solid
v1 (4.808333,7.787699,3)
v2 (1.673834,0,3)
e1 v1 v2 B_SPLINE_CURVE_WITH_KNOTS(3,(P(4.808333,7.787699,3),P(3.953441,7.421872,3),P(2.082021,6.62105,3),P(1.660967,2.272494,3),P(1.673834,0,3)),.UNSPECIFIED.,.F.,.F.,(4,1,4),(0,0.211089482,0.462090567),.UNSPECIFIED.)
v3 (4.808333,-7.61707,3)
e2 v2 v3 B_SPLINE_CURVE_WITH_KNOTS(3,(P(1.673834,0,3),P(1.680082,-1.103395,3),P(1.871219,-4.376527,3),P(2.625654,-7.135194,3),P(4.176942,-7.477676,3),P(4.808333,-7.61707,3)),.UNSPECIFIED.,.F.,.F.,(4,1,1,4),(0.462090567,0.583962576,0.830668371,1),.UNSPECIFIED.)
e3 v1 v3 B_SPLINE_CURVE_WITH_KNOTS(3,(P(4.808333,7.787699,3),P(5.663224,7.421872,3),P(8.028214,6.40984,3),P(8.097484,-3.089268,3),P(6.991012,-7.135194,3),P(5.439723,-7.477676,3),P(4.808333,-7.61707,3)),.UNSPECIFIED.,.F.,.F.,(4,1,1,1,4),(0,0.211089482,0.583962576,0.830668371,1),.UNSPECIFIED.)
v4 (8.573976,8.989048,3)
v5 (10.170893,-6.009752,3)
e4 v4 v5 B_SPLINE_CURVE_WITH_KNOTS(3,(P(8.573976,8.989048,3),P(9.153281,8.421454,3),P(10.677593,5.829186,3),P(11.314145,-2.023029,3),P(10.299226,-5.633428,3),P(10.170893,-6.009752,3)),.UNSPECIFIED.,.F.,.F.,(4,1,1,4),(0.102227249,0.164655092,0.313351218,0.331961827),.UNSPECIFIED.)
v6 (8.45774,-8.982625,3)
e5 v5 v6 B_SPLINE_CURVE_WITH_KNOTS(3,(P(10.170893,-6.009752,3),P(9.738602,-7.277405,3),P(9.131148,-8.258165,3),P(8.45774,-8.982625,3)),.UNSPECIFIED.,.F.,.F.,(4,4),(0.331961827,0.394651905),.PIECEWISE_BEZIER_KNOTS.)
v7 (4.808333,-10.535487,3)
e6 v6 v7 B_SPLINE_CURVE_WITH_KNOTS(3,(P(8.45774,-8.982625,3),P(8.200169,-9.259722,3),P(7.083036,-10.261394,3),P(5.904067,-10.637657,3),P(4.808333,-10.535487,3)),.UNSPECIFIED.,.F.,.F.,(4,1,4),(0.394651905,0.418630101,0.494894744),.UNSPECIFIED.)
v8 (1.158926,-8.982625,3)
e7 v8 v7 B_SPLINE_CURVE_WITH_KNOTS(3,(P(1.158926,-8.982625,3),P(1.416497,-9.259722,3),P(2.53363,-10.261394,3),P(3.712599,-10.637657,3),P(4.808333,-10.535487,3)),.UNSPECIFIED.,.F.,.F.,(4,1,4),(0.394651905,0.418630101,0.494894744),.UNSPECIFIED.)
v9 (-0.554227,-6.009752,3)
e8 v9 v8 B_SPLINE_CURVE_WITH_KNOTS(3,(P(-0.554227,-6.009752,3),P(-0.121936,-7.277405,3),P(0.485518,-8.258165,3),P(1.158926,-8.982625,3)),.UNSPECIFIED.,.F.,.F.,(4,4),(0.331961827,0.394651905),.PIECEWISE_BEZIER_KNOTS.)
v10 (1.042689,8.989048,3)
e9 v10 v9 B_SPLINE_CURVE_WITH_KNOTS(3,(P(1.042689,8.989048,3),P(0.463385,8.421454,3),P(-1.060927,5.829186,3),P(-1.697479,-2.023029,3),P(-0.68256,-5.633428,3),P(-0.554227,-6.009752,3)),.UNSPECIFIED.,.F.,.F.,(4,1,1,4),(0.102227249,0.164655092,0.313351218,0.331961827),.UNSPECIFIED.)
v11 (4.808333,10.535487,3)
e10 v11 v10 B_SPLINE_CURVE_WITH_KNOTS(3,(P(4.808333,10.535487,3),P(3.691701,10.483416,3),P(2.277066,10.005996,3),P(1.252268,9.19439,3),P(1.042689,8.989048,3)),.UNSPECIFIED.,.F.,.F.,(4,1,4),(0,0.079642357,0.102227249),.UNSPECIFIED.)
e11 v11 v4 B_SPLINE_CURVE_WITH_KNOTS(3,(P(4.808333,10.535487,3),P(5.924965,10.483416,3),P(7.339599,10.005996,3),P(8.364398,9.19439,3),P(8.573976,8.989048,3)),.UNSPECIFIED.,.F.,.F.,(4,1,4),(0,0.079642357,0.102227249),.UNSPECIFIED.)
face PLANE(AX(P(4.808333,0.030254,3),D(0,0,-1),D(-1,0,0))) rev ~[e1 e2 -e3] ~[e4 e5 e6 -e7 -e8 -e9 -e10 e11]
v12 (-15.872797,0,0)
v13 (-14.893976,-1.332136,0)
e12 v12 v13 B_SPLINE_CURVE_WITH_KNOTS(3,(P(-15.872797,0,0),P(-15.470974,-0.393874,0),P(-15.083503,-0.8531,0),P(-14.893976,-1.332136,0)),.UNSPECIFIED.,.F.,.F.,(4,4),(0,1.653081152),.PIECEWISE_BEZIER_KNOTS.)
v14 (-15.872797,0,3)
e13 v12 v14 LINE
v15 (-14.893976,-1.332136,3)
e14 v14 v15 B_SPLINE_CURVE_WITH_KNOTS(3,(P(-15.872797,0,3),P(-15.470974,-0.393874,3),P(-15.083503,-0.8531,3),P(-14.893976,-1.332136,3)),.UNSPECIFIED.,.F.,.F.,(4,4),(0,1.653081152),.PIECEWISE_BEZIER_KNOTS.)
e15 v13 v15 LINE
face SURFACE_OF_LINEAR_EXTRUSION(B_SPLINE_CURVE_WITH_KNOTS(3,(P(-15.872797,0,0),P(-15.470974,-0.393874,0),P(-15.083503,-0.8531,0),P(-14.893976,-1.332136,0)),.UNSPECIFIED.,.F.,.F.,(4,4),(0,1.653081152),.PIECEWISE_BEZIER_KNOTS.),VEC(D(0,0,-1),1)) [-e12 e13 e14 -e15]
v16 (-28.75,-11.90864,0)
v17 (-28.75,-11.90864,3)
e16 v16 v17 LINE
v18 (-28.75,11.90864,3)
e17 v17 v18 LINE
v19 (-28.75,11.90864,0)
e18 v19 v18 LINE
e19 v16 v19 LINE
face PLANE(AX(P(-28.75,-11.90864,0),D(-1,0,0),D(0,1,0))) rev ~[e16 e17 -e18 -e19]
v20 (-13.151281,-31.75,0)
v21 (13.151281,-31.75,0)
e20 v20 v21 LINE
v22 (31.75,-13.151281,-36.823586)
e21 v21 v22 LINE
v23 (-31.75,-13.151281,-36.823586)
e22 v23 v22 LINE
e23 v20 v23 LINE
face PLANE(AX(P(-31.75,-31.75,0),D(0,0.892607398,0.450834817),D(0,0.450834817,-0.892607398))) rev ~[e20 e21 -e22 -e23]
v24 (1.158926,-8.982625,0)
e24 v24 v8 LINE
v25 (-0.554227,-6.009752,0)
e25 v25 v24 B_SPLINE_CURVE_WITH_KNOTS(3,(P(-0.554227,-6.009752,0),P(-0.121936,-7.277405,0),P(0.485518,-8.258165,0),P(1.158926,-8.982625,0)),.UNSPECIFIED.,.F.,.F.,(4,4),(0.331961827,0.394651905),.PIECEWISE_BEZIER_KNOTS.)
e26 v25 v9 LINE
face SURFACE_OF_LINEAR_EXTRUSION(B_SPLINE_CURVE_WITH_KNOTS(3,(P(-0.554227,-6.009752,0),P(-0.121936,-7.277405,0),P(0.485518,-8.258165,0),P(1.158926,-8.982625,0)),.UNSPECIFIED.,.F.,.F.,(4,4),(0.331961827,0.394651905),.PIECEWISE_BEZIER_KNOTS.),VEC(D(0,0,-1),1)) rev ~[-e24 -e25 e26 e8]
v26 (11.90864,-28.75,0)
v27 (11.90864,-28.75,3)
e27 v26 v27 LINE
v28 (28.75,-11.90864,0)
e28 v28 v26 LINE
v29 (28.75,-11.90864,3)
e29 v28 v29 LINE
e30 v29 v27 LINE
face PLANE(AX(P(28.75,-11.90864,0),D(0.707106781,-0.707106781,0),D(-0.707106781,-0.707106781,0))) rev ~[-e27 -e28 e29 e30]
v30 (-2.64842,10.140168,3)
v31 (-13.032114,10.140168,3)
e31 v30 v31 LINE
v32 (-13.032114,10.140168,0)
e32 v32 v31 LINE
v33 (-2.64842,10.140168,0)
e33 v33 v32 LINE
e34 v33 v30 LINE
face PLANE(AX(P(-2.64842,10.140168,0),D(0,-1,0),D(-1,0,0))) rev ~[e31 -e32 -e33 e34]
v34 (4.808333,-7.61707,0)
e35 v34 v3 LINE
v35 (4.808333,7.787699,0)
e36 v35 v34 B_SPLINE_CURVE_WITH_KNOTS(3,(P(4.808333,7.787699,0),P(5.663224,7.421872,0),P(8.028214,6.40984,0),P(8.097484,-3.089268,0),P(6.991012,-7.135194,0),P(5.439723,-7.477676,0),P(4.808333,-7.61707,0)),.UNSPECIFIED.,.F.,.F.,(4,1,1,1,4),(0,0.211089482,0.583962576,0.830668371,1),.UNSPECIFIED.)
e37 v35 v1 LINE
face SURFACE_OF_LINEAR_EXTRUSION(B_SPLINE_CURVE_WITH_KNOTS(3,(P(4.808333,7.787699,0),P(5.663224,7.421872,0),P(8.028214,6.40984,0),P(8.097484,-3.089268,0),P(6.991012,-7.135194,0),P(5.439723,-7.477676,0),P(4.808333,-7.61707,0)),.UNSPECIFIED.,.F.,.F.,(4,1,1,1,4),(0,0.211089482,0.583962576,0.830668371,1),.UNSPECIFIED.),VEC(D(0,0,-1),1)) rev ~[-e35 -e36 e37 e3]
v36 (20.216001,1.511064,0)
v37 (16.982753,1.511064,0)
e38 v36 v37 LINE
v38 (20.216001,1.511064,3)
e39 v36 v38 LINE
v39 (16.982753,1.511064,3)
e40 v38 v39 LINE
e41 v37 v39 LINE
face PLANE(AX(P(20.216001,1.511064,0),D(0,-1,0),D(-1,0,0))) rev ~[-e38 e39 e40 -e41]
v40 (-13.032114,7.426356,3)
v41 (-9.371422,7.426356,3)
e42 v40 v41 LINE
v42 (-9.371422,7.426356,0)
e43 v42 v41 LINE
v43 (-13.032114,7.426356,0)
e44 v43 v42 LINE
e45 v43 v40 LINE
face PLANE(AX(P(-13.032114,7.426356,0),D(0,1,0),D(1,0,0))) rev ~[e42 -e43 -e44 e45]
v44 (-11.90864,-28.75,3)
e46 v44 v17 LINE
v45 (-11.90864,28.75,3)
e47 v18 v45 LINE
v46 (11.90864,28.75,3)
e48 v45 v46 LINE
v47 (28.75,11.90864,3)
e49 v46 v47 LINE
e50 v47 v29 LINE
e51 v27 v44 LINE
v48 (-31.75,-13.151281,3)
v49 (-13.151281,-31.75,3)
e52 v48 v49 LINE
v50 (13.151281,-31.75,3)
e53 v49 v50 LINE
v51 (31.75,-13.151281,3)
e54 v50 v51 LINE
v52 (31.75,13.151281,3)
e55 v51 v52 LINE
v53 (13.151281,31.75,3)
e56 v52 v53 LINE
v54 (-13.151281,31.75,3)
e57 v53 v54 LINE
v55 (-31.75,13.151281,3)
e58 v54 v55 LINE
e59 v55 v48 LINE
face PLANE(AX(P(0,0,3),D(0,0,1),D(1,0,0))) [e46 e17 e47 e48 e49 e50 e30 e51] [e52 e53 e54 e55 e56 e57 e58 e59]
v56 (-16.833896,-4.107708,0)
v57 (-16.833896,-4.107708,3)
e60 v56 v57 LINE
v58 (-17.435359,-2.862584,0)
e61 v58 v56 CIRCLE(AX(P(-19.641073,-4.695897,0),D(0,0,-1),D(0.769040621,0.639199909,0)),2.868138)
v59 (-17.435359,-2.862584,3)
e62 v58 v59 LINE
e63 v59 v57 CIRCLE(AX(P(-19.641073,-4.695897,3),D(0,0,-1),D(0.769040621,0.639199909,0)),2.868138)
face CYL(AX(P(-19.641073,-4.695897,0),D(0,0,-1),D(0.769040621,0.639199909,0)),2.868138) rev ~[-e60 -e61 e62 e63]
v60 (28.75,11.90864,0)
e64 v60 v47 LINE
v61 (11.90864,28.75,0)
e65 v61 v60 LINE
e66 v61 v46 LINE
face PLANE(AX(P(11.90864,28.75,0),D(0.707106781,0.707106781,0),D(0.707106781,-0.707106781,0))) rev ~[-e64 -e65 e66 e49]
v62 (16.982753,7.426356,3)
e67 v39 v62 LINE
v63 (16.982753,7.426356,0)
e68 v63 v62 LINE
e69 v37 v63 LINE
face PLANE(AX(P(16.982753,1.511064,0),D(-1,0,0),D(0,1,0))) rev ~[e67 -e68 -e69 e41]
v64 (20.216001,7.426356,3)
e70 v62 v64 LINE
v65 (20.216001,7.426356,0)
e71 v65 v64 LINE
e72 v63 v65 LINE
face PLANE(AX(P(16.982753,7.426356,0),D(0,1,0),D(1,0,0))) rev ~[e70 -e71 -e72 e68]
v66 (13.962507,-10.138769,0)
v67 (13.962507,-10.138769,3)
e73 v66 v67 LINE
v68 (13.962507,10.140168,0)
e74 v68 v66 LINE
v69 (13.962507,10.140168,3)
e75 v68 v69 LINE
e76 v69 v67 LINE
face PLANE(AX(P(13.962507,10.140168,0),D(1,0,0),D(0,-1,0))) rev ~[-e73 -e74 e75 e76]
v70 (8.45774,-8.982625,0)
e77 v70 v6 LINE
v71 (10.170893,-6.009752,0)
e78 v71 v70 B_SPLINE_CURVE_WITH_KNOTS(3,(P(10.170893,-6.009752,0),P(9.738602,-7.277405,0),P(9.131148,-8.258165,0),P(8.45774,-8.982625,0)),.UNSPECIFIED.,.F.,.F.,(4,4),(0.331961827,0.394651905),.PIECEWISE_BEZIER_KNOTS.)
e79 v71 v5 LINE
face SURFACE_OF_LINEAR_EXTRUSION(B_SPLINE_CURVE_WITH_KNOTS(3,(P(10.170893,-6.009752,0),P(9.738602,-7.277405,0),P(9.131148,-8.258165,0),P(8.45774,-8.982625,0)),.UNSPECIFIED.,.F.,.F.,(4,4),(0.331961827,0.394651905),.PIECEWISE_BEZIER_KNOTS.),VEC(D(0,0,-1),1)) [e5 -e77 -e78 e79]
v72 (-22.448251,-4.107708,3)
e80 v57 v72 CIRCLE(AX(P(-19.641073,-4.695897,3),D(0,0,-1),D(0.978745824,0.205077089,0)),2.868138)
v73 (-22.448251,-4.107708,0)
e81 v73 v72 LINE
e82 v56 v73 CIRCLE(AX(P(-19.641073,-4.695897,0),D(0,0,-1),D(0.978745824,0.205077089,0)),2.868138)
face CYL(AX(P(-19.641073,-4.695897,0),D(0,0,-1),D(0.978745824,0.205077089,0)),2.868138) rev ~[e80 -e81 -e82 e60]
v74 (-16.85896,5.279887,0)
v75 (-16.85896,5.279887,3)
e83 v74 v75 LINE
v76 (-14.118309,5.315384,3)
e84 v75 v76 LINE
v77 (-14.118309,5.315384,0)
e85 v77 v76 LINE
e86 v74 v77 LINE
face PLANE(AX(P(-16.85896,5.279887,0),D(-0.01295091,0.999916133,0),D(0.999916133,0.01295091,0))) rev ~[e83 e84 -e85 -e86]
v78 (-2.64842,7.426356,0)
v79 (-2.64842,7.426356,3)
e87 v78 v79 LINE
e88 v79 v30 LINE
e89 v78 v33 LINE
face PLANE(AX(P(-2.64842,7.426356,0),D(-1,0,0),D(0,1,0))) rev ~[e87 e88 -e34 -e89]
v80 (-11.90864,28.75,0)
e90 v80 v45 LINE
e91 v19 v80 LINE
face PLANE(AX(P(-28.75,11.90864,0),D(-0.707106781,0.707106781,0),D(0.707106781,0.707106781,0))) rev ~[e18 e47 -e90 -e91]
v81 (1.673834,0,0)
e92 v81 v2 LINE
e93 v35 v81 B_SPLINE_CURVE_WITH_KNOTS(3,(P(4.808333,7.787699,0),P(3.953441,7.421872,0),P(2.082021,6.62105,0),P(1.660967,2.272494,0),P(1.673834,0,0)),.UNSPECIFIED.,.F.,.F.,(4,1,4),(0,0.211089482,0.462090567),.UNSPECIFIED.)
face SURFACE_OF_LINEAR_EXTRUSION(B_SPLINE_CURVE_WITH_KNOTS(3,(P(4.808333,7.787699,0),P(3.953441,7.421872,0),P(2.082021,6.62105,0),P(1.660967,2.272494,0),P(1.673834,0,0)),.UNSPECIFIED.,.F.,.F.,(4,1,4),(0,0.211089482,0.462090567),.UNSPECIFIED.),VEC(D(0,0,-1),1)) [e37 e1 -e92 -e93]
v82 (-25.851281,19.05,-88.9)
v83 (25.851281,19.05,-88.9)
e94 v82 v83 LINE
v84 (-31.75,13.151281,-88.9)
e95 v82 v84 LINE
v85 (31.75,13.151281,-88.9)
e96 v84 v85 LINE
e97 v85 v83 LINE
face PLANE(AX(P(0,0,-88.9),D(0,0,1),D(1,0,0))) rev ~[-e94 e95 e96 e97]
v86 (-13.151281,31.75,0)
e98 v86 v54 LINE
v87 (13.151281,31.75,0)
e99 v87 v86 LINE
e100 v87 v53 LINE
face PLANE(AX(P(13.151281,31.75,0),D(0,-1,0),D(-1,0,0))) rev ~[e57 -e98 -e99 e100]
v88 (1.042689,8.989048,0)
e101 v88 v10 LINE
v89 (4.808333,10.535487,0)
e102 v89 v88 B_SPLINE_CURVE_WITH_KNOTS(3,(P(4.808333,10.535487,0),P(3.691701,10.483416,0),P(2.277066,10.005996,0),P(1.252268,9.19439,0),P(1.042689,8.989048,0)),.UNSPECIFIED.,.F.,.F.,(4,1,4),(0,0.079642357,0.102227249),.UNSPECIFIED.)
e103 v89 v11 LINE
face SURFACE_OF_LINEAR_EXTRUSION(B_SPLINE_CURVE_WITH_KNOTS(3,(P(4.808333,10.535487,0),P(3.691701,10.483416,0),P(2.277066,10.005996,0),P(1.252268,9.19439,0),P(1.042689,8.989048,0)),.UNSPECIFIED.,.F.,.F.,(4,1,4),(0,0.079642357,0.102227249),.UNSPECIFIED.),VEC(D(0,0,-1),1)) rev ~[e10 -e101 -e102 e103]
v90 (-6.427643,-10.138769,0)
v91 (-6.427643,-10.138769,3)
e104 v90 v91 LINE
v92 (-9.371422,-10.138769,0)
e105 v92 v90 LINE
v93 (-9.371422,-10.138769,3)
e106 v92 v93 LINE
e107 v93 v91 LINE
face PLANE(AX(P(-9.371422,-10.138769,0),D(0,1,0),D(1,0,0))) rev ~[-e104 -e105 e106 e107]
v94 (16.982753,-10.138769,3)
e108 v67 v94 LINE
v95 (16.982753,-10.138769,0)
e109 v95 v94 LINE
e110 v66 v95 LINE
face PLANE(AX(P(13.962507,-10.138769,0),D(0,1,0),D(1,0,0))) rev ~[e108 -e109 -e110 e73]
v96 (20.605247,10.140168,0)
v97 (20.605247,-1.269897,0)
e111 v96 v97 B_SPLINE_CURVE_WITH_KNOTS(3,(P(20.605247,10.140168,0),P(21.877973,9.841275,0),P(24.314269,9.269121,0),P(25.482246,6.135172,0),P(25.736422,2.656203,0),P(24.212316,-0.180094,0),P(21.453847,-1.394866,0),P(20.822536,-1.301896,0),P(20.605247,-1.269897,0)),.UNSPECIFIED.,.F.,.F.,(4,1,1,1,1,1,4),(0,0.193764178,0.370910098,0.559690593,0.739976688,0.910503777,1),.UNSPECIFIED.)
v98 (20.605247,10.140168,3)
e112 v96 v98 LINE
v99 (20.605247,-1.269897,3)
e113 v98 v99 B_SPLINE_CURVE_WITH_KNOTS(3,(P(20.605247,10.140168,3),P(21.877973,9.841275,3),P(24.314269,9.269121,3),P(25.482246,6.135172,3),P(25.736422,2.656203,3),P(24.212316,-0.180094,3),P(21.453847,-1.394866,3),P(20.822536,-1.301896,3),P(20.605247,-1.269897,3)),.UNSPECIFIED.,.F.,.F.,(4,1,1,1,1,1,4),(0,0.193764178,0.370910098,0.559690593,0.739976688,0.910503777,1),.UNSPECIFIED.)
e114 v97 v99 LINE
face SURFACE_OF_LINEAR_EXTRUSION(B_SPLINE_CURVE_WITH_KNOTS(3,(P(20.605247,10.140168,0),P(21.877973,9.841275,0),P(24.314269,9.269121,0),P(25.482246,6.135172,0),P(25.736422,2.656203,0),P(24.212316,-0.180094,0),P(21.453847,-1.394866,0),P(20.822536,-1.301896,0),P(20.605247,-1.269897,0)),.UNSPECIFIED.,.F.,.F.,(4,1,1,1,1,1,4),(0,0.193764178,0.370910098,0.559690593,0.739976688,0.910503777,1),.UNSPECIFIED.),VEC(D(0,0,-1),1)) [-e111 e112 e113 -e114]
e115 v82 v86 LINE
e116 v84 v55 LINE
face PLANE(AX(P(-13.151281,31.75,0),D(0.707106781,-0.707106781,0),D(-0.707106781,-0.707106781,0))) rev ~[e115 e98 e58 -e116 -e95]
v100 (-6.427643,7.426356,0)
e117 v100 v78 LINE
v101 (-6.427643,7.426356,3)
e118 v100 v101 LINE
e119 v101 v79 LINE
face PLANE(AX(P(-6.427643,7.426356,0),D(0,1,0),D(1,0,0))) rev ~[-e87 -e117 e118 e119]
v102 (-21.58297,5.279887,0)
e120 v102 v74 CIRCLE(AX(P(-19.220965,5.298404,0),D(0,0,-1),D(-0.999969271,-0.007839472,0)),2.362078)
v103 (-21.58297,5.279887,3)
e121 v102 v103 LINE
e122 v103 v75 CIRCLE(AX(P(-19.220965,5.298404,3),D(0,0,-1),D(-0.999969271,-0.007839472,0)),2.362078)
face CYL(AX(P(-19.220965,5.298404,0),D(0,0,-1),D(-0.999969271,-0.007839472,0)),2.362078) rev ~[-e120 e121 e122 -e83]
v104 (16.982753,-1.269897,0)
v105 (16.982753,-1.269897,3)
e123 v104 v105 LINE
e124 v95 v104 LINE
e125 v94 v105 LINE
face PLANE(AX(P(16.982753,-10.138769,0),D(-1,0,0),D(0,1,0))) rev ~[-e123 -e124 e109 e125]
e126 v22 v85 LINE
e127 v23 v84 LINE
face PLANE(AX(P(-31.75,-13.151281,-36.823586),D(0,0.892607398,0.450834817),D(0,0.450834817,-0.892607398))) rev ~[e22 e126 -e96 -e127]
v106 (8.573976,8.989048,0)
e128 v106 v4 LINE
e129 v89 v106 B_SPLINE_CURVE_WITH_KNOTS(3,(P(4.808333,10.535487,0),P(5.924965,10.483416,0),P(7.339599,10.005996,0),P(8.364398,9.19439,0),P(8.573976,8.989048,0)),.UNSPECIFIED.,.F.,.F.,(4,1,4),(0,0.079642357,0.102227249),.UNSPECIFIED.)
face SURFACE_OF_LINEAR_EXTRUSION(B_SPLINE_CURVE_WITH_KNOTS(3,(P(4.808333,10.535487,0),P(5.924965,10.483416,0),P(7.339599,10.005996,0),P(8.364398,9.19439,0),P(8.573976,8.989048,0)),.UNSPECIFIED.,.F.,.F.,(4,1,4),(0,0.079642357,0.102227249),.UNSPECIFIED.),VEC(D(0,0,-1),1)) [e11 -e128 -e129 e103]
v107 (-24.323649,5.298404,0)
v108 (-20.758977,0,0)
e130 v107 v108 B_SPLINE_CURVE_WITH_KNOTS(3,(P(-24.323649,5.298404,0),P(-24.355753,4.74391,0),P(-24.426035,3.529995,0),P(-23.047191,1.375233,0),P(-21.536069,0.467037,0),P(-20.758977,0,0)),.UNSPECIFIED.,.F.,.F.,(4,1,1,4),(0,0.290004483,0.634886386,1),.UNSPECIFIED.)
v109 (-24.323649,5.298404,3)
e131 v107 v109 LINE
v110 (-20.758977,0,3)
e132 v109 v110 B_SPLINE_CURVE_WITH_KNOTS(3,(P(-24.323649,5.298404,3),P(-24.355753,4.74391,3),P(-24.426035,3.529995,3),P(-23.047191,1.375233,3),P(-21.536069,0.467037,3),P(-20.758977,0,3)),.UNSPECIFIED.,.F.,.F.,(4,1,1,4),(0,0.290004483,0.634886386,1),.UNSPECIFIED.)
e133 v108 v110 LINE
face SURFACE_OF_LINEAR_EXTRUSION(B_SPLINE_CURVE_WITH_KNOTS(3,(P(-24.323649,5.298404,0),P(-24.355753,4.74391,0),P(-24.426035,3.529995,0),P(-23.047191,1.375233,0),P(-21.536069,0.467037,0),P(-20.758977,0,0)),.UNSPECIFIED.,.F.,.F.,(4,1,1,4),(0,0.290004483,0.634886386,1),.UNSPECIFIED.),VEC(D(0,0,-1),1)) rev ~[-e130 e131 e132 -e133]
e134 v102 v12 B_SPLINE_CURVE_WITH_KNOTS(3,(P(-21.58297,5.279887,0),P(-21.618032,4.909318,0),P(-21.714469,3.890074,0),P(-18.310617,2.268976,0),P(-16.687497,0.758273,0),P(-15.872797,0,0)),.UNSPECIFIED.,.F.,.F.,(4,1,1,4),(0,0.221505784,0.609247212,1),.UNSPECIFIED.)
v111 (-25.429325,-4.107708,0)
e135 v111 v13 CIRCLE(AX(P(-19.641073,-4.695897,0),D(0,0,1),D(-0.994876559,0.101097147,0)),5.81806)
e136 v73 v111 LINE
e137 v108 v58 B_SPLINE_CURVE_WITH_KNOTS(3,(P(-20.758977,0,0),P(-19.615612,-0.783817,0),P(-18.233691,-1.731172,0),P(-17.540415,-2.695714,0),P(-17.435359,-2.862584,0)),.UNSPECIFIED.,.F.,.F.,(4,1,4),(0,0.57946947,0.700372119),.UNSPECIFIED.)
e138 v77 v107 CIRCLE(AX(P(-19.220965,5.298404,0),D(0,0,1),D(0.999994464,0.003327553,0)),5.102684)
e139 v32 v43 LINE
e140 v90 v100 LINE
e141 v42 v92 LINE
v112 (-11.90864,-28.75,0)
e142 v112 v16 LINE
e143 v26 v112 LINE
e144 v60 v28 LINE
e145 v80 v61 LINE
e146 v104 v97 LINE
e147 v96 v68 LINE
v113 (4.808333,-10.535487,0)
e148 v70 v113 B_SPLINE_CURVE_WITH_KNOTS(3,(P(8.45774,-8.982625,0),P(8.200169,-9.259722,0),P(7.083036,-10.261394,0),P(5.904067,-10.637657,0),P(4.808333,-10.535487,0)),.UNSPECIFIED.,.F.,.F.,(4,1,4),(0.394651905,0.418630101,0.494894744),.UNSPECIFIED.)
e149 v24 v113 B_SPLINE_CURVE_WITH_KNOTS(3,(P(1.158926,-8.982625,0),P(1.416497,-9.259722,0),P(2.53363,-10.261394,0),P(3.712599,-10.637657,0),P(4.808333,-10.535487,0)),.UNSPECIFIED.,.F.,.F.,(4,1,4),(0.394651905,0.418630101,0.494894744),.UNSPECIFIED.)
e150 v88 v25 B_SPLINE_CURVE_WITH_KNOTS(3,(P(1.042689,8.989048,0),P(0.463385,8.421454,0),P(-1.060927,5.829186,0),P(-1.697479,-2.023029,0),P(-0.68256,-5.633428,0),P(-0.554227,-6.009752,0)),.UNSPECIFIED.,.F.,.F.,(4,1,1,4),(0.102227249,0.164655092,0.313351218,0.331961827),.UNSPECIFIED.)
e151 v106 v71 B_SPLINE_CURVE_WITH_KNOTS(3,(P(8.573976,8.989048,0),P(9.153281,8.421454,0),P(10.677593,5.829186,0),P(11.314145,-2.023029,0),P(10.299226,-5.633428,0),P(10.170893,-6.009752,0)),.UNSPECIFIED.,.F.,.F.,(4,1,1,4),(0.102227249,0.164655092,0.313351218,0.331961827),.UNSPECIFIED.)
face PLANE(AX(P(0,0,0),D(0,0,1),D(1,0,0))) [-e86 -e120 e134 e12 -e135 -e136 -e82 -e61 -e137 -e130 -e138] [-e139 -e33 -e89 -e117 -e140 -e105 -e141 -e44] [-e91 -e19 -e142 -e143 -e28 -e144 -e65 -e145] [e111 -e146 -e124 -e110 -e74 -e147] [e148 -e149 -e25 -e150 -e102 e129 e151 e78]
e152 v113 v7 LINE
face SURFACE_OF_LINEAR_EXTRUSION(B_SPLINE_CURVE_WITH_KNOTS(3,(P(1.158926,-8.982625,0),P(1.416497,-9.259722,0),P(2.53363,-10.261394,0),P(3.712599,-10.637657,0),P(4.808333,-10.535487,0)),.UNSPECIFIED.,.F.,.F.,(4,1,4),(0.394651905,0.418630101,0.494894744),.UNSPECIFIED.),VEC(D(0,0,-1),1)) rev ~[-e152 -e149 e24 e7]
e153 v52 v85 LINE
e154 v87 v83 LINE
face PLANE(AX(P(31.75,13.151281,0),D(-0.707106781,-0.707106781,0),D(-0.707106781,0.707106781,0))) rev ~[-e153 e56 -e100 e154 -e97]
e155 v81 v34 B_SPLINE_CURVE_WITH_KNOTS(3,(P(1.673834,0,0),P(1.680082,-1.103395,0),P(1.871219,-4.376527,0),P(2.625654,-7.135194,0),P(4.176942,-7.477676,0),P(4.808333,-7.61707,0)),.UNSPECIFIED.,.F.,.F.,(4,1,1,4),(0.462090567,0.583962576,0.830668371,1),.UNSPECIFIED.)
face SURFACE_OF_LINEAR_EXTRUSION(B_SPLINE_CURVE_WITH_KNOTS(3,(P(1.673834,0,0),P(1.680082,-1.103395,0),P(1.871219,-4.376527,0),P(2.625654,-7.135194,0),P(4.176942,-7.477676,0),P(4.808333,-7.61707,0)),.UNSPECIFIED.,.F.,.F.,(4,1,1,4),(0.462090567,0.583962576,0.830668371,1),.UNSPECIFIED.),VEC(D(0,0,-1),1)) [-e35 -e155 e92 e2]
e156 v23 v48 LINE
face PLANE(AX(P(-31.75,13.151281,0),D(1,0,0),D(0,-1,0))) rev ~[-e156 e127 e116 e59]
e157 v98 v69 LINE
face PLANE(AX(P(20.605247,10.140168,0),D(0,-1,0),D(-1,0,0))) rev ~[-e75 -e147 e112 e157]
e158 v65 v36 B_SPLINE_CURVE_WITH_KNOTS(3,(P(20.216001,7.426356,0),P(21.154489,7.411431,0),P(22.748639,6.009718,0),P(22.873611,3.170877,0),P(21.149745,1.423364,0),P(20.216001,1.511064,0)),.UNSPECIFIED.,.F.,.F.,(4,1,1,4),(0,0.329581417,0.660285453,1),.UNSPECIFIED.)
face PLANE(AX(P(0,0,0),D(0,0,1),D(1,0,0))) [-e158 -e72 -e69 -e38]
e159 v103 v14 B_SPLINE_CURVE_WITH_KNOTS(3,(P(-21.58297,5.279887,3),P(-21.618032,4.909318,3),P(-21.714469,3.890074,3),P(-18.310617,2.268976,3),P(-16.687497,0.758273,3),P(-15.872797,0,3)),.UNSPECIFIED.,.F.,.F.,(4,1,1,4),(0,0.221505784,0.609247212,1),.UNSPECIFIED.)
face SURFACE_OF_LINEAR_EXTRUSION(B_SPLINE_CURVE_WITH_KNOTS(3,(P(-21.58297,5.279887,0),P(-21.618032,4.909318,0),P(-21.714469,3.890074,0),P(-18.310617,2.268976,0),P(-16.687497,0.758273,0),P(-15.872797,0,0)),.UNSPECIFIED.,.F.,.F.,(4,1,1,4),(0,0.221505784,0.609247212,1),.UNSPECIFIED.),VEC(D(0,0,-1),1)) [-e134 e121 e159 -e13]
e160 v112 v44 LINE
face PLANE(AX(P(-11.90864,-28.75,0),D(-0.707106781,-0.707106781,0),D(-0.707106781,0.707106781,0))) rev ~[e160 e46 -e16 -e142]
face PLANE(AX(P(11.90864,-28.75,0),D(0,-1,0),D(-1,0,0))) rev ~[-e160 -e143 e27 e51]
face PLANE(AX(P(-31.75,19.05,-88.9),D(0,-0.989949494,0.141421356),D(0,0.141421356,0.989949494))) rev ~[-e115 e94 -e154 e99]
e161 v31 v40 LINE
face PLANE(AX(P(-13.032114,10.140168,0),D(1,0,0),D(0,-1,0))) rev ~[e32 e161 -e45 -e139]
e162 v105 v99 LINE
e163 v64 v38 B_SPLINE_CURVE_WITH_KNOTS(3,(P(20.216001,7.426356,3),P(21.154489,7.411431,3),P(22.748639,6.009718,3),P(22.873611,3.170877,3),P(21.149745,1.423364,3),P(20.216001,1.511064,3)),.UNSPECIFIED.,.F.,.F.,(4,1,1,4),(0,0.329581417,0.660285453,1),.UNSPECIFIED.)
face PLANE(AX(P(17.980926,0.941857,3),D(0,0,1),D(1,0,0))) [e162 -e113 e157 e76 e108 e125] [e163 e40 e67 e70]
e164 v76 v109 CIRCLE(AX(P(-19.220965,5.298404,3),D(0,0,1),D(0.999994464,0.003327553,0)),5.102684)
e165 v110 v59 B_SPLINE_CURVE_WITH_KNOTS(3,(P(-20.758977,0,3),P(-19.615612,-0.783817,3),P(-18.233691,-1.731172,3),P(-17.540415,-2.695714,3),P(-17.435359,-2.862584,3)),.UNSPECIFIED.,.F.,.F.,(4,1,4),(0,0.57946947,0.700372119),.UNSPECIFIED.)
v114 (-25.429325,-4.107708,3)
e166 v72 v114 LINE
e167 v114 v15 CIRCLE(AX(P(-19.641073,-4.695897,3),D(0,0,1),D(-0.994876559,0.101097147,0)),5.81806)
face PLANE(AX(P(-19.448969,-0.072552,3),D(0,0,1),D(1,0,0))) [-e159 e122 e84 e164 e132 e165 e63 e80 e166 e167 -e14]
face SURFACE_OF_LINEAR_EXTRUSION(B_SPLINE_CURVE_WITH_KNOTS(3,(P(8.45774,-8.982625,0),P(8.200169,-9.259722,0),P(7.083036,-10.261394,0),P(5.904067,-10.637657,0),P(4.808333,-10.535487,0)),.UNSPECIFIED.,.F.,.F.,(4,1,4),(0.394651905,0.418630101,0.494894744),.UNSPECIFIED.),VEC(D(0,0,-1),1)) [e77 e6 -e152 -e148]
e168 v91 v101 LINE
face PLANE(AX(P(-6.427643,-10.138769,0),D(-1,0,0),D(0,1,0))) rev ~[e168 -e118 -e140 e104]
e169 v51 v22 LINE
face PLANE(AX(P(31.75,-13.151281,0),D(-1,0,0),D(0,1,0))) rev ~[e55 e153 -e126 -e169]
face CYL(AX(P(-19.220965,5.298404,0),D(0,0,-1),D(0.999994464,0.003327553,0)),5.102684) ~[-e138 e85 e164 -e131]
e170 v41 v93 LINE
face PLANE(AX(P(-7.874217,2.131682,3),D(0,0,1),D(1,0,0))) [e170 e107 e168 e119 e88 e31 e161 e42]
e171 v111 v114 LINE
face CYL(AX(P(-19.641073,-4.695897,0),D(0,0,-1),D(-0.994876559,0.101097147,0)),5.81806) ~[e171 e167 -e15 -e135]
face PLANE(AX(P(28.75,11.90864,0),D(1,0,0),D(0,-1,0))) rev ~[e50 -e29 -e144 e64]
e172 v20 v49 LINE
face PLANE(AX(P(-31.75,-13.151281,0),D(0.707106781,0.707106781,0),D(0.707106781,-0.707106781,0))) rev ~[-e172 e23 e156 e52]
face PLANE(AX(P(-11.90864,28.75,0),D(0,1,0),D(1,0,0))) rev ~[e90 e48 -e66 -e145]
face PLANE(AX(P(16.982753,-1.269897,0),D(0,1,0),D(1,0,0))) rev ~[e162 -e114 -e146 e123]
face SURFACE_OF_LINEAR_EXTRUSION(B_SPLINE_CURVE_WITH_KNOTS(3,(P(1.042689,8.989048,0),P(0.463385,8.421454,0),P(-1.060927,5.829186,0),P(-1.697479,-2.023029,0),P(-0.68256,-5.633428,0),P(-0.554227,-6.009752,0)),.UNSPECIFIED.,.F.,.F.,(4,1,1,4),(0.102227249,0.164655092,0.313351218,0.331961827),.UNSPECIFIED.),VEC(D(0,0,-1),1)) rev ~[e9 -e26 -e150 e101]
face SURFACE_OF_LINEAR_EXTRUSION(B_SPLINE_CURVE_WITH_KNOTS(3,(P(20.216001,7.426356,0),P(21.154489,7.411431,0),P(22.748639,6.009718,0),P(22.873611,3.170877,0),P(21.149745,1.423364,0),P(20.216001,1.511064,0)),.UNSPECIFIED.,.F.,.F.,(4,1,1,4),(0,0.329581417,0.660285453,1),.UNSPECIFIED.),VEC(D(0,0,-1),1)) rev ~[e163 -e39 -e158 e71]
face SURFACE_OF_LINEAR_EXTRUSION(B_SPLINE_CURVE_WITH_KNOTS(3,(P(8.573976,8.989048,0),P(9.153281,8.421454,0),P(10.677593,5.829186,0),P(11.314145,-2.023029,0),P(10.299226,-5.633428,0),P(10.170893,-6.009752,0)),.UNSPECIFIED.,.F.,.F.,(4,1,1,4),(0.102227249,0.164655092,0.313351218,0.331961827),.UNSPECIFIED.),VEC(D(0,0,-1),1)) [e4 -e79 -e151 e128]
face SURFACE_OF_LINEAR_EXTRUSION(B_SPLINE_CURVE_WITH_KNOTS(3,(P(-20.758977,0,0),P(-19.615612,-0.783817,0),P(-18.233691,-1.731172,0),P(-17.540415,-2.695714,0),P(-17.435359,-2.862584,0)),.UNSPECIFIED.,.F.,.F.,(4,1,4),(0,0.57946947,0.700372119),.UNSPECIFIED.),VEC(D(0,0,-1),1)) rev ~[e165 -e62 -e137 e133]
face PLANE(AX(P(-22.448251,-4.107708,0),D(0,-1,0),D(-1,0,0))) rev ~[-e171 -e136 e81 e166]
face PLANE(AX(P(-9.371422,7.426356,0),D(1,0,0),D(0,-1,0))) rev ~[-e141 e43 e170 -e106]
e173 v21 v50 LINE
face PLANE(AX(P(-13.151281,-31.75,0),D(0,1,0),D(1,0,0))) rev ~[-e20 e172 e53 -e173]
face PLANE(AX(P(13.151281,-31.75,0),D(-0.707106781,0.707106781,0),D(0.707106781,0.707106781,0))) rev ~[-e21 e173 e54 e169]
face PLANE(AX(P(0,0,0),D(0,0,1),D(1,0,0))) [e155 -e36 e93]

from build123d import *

# Parameters (mm, degrees)
F1_DEPTH   = 88.9
F1_FACE1_W = 26.3025612107
F1_FACE1_H = 88.9
F3_DEPTH   = 63.5
F5_DEPTH   = 3


# Not quite as in the source:
# - a feature names something its author has since deleted; it is built from what else it names


with BuildPart() as f1:
    # F0 (on Top) → F1 (new body)
    with BuildSketch(Plane.XY):
        Polygon((13.1512806053, 31.75), (-13.1512806053, 31.75), (-31.75, 13.1512806053), (-31.75, -13.1512806053), (-13.1512806053, -31.75), (13.1512806053, -31.75), (31.75, -13.1512806053), (31.75, 13.1512806053), align=None)
    extrude(amount=-F1_DEPTH)

    # F2 (on face) + F1_face1 (on face) → F3 (cut, through all)
    with BuildSketch(Plane(origin=(-31.75, 0, 0), x_dir=(0, -1, 0), z_dir=(-1, 0, 0))):
        Polygon((-19.05, -88.9), (-31.75, 0), (-31.75, -88.9), align=None)
        Polygon((31.75, -88.9), (31.75, 0), (13.1512806053, -36.823585695), (13.1512806053, -88.9), (14.6601814777, -88.9), align=None)
        Polygon((13.1512806053, -36.823585695), (-13.1512806053, -88.9), (-12.7, -88.9), (-6.35, -88.9), (0, -88.9), (8.3101814777, -88.9), (13.1512806053, -88.9), align=None)
    with BuildSketch(Plane(origin=(22.4506403027, -22.4506403027, -44.45), x_dir=(0.7071067812, 0.7071067812, 0), z_dir=(0.7071067812, -0.7071067812, 0))):
        Rectangle(F1_FACE1_W, F1_FACE1_H)
    extrude(amount=-F3_DEPTH, dir=(-1, 0, 0), mode=Mode.SUBTRACT)

    # F4 (on face) → F5 (join)
    with BuildSketch(Plane.XY):
        Polygon((13.1512806053, 31.75), (-13.1512806053, 31.75), (-31.75, 13.1512806053), (-31.75, -13.1512806053), (-13.1512806053, -31.75), (13.1512806053, -31.75), (31.75, -13.1512806053), (31.75, 13.1512806053), align=None)
        Polygon((-28.75, 10.7754608616), (-28.75, 11.9086399182), (-11.9086399182, 28.75), (11.9086399182, 28.75), (28.75, 11.9086399182), (28.75, 10.7754608616), (28.75, -10.7754608616), (28.75, -11.9086399182), (11.9086399182, -28.75), (-11.9086399182, -28.75), (-28.75, -11.9086399182), (-28.75, -10.7754608616), align=None, mode=Mode.SUBTRACT)
        with BuildLine():
            add(Edge.make_bspline(
                [(4.8083327711, 10.5354869738), (5.9249649259, 10.4834162819), (7.339599469, 10.0059956165), (8.3643975774, 9.1943899894), (8.5739761095, 8.9890481737)],
                knots=[0, 0, 0, 0, 0.0796423572, 0.1022272486, 0.1022272486, 0.1022272486, 0.1022272486], degree=3))
            add(Edge.make_bspline(
                [(4.8083327711, 10.5354869738), (3.6917006162, 10.4834162819), (2.2770660731, 10.0059956165), (1.2522679647, 9.1943899894), (1.0426894326, 8.9890481737)],
                knots=[0, 0, 0, 0, 0.0796423572, 0.1022272486, 0.1022272486, 0.1022272486, 0.1022272486], degree=3))
            add(Edge.make_bspline(
                [(-0.5542273499, -6.0097523046), (-0.6853048791, -5.4911473404), (-1.2029837025, -2.5307480598), (-1.3645767848, 4.0861219904), (0.1727738224, 7.9642019091), (1.0426894326, 8.9890481737)],
                knots=[0.6521796741, 0.6521796741, 0.6521796741, 0.6521796741, 0.683293281, 0.8153772216, 0.9015400151, 0.9015400151, 0.9015400151, 0.9015400151], degree=3))
            add(Edge.make_bspline(
                [(-0.5542273499, -6.0097523046), (-0.1219359708, -7.2774050993), (0.4855176774, -8.258165167), (1.158925978, -8.9826247772)],
                knots=[0.3319618275, 0.3319618275, 0.3319618275, 0.3319618275, 0.3946519049, 0.3946519049, 0.3946519049, 0.3946519049], degree=3))
            add(Edge.make_bspline(
                [(4.8083327711, -10.5354869738), (3.6099604652, -10.4237469099), (2.1738291685, -9.8473995471), (1.158925978, -8.9826247772)],
                knots=[0.4948947439, 0.4948947439, 0.4948947439, 0.4948947439, 0.5783031472, 0.5783031472, 0.5783031472, 0.5783031472], degree=3))
            add(Edge.make_bspline(
                [(4.8083327711, -10.5354869738), (6.0067050769, -10.4237469099), (7.4428363737, -9.8473995471), (8.4577395641, -8.9826247772)],
                knots=[0.4948947439, 0.4948947439, 0.4948947439, 0.4948947439, 0.5783031472, 0.5783031472, 0.5783031472, 0.5783031472], degree=3))
            add(Edge.make_bspline(
                [(10.170892892, -6.0097523046), (9.7386015129, -7.2774050993), (9.1311478647, -8.258165167), (8.4577395641, -8.9826247772)],
                knots=[0.3319618275, 0.3319618275, 0.3319618275, 0.3319618275, 0.3946519049, 0.3946519049, 0.3946519049, 0.3946519049], degree=3))
            add(Edge.make_bspline(
                [(10.170892892, -6.0097523046), (10.3019704212, -5.4911473404), (10.8196492446, -2.5307480598), (10.9812423269, 4.0861219904), (9.4438917197, 7.9642019091), (8.5739761095, 8.9890481737)],
                knots=[0.6521796741, 0.6521796741, 0.6521796741, 0.6521796741, 0.683293281, 0.8153772216, 0.9015400151, 0.9015400151, 0.9015400151, 0.9015400151], degree=3))
        make_face()
        with BuildLine():
            add(Edge.make_bspline(
                [(4.8083327711, 7.7876993455), (3.9534414496, 7.4218723248), (2.0820207972, 6.6210497822), (1.660966503, 2.272494011), (1.6738338819, 0)],
                knots=[0, 0, 0, 0, 0.2110894815, 0.4620905666, 0.4620905666, 0.4620905666, 0.4620905666], degree=3))
            add(Edge.make_bspline(
                [(4.8083327711, 7.7876993455), (5.6632240926, 7.4218723248), (8.028214212, 6.4098404237), (8.0974839635, -3.0892679636), (6.9910117402, -7.135194286), (5.4397234852, -7.47767614), (4.8083327711, -7.617069874)],
                knots=[0, 0, 0, 0, 0.2110894815, 0.5839625756, 0.8306683715, 1, 1, 1, 1], degree=3))
            add(Edge.make_bspline(
                [(1.6738338819, 0), (1.6800815574, -1.1033952726), (1.8712186248, -4.3765266238), (2.6256538019, -7.135194286), (4.1769420569, -7.47767614), (4.8083327711, -7.617069874)],
                knots=[0.4620905666, 0.4620905666, 0.4620905666, 0.4620905666, 0.5839625756, 0.8306683715, 1, 1, 1, 1], degree=3))
        make_face(mode=Mode.SUBTRACT)
        with BuildLine():
            Line((20.6052474678, 10.1401684806), (13.9625072479, 10.1401684806))
            Line((13.9625072479, 10.1401684806), (13.9625072479, -10.1387687027))
            Line((13.9625072479, -10.1387687027), (16.9827528298, -10.1387687027))
            Line((16.9827528298, -10.1387687027), (16.9827528298, -1.2698972132))
            Line((16.9827528298, -1.2698972132), (20.6052474678, -1.2698972132))
            add(Edge.make_bspline(
                [(20.6052474678, 10.1401684806), (21.8779731079, 9.8412745125), (24.3142685907, 9.2691213309), (25.4822457744, 6.1351724103), (25.736421693, 2.6562033682), (24.2123159942, -0.1800935194), (21.4538469207, -1.3948664952), (20.8225355964, -1.3018962221), (20.6052474678, -1.2698972132)],
                knots=[0, 0, 0, 0, 0.1937641782, 0.3709100981, 0.5596905933, 0.7399766879, 0.9105037773, 1, 1, 1, 1], degree=3))
        make_face()
        with BuildLine():
            Line((20.2160011977, 1.5110635431), (16.9827528298, 1.5110635431))
            Line((16.9827528298, 1.5110635431), (16.9827528298, 7.4263564311))
            Line((16.9827528298, 7.4263564311), (20.2160011977, 7.4263564311))
            add(Edge.make_bspline(
                [(20.2160011977, 7.4263564311), (21.1544893682, 7.4114310555), (22.7486394765, 6.0097179724), (22.8736105917, 3.1708769977), (21.149745211, 1.4233636903), (20.2160011977, 1.5110635431)],
                knots=[0, 0, 0, 0, 0.3295814167, 0.6602854532, 1, 1, 1, 1], degree=3))
        make_face(mode=Mode.SUBTRACT)
        with BuildLine():
            ThreePointArc((-16.8338958174, -4.1077076457), (-19.6410734206, -7.564034438), (-22.4482510239, -4.1077076457))
            Line((-22.4482510239, -4.1077076457), (-25.4293251783, -4.1077076457))
            ThreePointArc((-25.4293251783, -4.1077076457), (-18.1588622297, -10.3219857216), (-14.8939756829, -1.3321359272))
            add(Edge.make_bspline(
                [(-15.8727969974, 0), (-15.4709741473, -0.3938739537), (-15.0835029781, -0.853099511), (-14.8939756829, -1.3321359272)],
                knots=[0, 0, 0, 0, 1.6530811518, 1.6530811518, 1.6530811518, 1.6530811518], degree=3))
            add(Edge.make_bspline(
                [(-21.5829703957, 5.279887002), (-21.6180322262, 4.9093177243), (-21.7144690872, 3.8900743649), (-18.3106174987, 2.2689761454), (-16.6874966749, 0.7582732743), (-15.8727969974, 0)],
                knots=[0, 0, 0, 0, 0.221505784, 0.6092472123, 1, 1, 1, 1], degree=3))
            ThreePointArc((-21.5829703957, 5.279887002), (-19.2209649831, 7.6604824432), (-16.8589595705, 5.279887002))
            Line((-16.8589595705, 5.279887002), (-14.1183091328, 5.3153838962))
            ThreePointArc((-14.1183091328, 5.3153838962), (-19.22945472, 10.4010814839), (-24.3236490835, 5.298404446))
            add(Edge.make_bspline(
                [(-24.3236490835, 5.298404446), (-24.3557528234, 4.7439102233), (-24.4260352796, 3.5299950823), (-23.0471913533, 1.3752329572), (-21.5360686477, 0.4670374949), (-20.7589771599, 0)],
                knots=[0, 0, 0, 0, 0.2900044831, 0.6348863858, 1, 1, 1, 1], degree=3))
            add(Edge.make_bspline(
                [(-20.7589771599, 0), (-19.6156120227, -0.7838167648), (-18.2336909625, -1.7311719529), (-17.5404152252, -2.6957135463), (-17.4353591755, -2.8625837034)],
                knots=[0, 0, 0, 0, 0.5794694701, 0.7003721194, 0.7003721194, 0.7003721194, 0.7003721194], degree=3))
            ThreePointArc((-17.4353591755, -2.8625837034), (-17.0584672604, -3.448356091), (-16.8338958174, -4.1077076457))
        make_face()
        Polygon((-9.3714222312, 7.4263564311), (-9.3714222312, -10.1387687027), (-6.427643355, -10.1387687027), (-6.427643355, 7.4263564311), (-2.6484197006, 7.4263564311), (-2.6484197006, 10.1401684806), (-6.427643355, 10.1401684806), (-9.3714222312, 10.1401684806), (-13.0321141332, 10.1401684806), (-13.0321141332, 7.4263564311), align=None)
        with BuildLine():
            add(Edge.make_bspline(
                [(-0.5542273499, -6.0097523046), (-0.6853048791, -5.4911473404), (-1.2029837025, -2.5307480598), (-1.3645767848, 4.0861219904), (0.1727738224, 7.9642019091), (1.0426894326, 8.9890481737)],
                knots=[0.6521796741, 0.6521796741, 0.6521796741, 0.6521796741, 0.683293281, 0.8153772216, 0.9015400151, 0.9015400151, 0.9015400151, 0.9015400151], degree=3))
            add(Edge.make_bspline(
                [(1.0426894326, 8.9890481737), (0.4633846395, 8.4214542659), (-1.0609269861, 5.8291860693), (-1.6974790085, -2.0230291515), (-0.6825603591, -5.6334281267), (-0.5542273499, -6.0097523046)],
                knots=[0.1022272486, 0.1022272486, 0.1022272486, 0.1022272486, 0.1646550922, 0.3133512175, 0.3319618275, 0.3319618275, 0.3319618275, 0.3319618275], degree=3))
        make_face()
        with BuildLine():
            add(Edge.make_bspline(
                [(8.5739761095, 8.9890481737), (9.1532809026, 8.4214542659), (10.6775925282, 5.8291860693), (11.3141445506, -2.0230291515), (10.2992259012, -5.6334281267), (10.170892892, -6.0097523046)],
                knots=[0.1022272486, 0.1022272486, 0.1022272486, 0.1022272486, 0.1646550922, 0.3133512175, 0.3319618275, 0.3319618275, 0.3319618275, 0.3319618275], degree=3))
            add(Edge.make_bspline(
                [(10.170892892, -6.0097523046), (10.3019704212, -5.4911473404), (10.8196492446, -2.5307480598), (10.9812423269, 4.0861219904), (9.4438917197, 7.9642019091), (8.5739761095, 8.9890481737)],
                knots=[0.6521796741, 0.6521796741, 0.6521796741, 0.6521796741, 0.683293281, 0.8153772216, 0.9015400151, 0.9015400151, 0.9015400151, 0.9015400151], degree=3))
        make_face()
        with BuildLine():
            add(Edge.make_bspline(
                [(4.8083327711, -10.5354869738), (3.6099604652, -10.4237469099), (2.1738291685, -9.8473995471), (1.158925978, -8.9826247772)],
                knots=[0.4948947439, 0.4948947439, 0.4948947439, 0.4948947439, 0.5783031472, 0.5783031472, 0.5783031472, 0.5783031472], degree=3))
            add(Edge.make_bspline(
                [(1.158925978, -8.9826247772), (1.4164965069, -9.2597218145), (2.5336297837, -10.2613938856), (3.712598623, -10.6376567279), (4.8083327711, -10.5354869738)],
                knots=[0.3946519049, 0.3946519049, 0.3946519049, 0.3946519049, 0.4186301011, 0.4948947439, 0.4948947439, 0.4948947439, 0.4948947439], degree=3))
        make_face()
        with BuildLine():
            add(Edge.make_bspline(
                [(8.4577395641, -8.9826247772), (8.2001690352, -9.2597218145), (7.0830357584, -10.2613938856), (5.9040669191, -10.6376567279), (4.8083327711, -10.5354869738)],
                knots=[0.3946519049, 0.3946519049, 0.3946519049, 0.3946519049, 0.4186301011, 0.4948947439, 0.4948947439, 0.4948947439, 0.4948947439], degree=3))
            add(Edge.make_bspline(
                [(4.8083327711, -10.5354869738), (6.0067050769, -10.4237469099), (7.4428363737, -9.8473995471), (8.4577395641, -8.9826247772)],
                knots=[0.4948947439, 0.4948947439, 0.4948947439, 0.4948947439, 0.5783031472, 0.5783031472, 0.5783031472, 0.5783031472], degree=3))
        make_face()
    extrude(amount=F5_DEPTH)


solid = f1.part
